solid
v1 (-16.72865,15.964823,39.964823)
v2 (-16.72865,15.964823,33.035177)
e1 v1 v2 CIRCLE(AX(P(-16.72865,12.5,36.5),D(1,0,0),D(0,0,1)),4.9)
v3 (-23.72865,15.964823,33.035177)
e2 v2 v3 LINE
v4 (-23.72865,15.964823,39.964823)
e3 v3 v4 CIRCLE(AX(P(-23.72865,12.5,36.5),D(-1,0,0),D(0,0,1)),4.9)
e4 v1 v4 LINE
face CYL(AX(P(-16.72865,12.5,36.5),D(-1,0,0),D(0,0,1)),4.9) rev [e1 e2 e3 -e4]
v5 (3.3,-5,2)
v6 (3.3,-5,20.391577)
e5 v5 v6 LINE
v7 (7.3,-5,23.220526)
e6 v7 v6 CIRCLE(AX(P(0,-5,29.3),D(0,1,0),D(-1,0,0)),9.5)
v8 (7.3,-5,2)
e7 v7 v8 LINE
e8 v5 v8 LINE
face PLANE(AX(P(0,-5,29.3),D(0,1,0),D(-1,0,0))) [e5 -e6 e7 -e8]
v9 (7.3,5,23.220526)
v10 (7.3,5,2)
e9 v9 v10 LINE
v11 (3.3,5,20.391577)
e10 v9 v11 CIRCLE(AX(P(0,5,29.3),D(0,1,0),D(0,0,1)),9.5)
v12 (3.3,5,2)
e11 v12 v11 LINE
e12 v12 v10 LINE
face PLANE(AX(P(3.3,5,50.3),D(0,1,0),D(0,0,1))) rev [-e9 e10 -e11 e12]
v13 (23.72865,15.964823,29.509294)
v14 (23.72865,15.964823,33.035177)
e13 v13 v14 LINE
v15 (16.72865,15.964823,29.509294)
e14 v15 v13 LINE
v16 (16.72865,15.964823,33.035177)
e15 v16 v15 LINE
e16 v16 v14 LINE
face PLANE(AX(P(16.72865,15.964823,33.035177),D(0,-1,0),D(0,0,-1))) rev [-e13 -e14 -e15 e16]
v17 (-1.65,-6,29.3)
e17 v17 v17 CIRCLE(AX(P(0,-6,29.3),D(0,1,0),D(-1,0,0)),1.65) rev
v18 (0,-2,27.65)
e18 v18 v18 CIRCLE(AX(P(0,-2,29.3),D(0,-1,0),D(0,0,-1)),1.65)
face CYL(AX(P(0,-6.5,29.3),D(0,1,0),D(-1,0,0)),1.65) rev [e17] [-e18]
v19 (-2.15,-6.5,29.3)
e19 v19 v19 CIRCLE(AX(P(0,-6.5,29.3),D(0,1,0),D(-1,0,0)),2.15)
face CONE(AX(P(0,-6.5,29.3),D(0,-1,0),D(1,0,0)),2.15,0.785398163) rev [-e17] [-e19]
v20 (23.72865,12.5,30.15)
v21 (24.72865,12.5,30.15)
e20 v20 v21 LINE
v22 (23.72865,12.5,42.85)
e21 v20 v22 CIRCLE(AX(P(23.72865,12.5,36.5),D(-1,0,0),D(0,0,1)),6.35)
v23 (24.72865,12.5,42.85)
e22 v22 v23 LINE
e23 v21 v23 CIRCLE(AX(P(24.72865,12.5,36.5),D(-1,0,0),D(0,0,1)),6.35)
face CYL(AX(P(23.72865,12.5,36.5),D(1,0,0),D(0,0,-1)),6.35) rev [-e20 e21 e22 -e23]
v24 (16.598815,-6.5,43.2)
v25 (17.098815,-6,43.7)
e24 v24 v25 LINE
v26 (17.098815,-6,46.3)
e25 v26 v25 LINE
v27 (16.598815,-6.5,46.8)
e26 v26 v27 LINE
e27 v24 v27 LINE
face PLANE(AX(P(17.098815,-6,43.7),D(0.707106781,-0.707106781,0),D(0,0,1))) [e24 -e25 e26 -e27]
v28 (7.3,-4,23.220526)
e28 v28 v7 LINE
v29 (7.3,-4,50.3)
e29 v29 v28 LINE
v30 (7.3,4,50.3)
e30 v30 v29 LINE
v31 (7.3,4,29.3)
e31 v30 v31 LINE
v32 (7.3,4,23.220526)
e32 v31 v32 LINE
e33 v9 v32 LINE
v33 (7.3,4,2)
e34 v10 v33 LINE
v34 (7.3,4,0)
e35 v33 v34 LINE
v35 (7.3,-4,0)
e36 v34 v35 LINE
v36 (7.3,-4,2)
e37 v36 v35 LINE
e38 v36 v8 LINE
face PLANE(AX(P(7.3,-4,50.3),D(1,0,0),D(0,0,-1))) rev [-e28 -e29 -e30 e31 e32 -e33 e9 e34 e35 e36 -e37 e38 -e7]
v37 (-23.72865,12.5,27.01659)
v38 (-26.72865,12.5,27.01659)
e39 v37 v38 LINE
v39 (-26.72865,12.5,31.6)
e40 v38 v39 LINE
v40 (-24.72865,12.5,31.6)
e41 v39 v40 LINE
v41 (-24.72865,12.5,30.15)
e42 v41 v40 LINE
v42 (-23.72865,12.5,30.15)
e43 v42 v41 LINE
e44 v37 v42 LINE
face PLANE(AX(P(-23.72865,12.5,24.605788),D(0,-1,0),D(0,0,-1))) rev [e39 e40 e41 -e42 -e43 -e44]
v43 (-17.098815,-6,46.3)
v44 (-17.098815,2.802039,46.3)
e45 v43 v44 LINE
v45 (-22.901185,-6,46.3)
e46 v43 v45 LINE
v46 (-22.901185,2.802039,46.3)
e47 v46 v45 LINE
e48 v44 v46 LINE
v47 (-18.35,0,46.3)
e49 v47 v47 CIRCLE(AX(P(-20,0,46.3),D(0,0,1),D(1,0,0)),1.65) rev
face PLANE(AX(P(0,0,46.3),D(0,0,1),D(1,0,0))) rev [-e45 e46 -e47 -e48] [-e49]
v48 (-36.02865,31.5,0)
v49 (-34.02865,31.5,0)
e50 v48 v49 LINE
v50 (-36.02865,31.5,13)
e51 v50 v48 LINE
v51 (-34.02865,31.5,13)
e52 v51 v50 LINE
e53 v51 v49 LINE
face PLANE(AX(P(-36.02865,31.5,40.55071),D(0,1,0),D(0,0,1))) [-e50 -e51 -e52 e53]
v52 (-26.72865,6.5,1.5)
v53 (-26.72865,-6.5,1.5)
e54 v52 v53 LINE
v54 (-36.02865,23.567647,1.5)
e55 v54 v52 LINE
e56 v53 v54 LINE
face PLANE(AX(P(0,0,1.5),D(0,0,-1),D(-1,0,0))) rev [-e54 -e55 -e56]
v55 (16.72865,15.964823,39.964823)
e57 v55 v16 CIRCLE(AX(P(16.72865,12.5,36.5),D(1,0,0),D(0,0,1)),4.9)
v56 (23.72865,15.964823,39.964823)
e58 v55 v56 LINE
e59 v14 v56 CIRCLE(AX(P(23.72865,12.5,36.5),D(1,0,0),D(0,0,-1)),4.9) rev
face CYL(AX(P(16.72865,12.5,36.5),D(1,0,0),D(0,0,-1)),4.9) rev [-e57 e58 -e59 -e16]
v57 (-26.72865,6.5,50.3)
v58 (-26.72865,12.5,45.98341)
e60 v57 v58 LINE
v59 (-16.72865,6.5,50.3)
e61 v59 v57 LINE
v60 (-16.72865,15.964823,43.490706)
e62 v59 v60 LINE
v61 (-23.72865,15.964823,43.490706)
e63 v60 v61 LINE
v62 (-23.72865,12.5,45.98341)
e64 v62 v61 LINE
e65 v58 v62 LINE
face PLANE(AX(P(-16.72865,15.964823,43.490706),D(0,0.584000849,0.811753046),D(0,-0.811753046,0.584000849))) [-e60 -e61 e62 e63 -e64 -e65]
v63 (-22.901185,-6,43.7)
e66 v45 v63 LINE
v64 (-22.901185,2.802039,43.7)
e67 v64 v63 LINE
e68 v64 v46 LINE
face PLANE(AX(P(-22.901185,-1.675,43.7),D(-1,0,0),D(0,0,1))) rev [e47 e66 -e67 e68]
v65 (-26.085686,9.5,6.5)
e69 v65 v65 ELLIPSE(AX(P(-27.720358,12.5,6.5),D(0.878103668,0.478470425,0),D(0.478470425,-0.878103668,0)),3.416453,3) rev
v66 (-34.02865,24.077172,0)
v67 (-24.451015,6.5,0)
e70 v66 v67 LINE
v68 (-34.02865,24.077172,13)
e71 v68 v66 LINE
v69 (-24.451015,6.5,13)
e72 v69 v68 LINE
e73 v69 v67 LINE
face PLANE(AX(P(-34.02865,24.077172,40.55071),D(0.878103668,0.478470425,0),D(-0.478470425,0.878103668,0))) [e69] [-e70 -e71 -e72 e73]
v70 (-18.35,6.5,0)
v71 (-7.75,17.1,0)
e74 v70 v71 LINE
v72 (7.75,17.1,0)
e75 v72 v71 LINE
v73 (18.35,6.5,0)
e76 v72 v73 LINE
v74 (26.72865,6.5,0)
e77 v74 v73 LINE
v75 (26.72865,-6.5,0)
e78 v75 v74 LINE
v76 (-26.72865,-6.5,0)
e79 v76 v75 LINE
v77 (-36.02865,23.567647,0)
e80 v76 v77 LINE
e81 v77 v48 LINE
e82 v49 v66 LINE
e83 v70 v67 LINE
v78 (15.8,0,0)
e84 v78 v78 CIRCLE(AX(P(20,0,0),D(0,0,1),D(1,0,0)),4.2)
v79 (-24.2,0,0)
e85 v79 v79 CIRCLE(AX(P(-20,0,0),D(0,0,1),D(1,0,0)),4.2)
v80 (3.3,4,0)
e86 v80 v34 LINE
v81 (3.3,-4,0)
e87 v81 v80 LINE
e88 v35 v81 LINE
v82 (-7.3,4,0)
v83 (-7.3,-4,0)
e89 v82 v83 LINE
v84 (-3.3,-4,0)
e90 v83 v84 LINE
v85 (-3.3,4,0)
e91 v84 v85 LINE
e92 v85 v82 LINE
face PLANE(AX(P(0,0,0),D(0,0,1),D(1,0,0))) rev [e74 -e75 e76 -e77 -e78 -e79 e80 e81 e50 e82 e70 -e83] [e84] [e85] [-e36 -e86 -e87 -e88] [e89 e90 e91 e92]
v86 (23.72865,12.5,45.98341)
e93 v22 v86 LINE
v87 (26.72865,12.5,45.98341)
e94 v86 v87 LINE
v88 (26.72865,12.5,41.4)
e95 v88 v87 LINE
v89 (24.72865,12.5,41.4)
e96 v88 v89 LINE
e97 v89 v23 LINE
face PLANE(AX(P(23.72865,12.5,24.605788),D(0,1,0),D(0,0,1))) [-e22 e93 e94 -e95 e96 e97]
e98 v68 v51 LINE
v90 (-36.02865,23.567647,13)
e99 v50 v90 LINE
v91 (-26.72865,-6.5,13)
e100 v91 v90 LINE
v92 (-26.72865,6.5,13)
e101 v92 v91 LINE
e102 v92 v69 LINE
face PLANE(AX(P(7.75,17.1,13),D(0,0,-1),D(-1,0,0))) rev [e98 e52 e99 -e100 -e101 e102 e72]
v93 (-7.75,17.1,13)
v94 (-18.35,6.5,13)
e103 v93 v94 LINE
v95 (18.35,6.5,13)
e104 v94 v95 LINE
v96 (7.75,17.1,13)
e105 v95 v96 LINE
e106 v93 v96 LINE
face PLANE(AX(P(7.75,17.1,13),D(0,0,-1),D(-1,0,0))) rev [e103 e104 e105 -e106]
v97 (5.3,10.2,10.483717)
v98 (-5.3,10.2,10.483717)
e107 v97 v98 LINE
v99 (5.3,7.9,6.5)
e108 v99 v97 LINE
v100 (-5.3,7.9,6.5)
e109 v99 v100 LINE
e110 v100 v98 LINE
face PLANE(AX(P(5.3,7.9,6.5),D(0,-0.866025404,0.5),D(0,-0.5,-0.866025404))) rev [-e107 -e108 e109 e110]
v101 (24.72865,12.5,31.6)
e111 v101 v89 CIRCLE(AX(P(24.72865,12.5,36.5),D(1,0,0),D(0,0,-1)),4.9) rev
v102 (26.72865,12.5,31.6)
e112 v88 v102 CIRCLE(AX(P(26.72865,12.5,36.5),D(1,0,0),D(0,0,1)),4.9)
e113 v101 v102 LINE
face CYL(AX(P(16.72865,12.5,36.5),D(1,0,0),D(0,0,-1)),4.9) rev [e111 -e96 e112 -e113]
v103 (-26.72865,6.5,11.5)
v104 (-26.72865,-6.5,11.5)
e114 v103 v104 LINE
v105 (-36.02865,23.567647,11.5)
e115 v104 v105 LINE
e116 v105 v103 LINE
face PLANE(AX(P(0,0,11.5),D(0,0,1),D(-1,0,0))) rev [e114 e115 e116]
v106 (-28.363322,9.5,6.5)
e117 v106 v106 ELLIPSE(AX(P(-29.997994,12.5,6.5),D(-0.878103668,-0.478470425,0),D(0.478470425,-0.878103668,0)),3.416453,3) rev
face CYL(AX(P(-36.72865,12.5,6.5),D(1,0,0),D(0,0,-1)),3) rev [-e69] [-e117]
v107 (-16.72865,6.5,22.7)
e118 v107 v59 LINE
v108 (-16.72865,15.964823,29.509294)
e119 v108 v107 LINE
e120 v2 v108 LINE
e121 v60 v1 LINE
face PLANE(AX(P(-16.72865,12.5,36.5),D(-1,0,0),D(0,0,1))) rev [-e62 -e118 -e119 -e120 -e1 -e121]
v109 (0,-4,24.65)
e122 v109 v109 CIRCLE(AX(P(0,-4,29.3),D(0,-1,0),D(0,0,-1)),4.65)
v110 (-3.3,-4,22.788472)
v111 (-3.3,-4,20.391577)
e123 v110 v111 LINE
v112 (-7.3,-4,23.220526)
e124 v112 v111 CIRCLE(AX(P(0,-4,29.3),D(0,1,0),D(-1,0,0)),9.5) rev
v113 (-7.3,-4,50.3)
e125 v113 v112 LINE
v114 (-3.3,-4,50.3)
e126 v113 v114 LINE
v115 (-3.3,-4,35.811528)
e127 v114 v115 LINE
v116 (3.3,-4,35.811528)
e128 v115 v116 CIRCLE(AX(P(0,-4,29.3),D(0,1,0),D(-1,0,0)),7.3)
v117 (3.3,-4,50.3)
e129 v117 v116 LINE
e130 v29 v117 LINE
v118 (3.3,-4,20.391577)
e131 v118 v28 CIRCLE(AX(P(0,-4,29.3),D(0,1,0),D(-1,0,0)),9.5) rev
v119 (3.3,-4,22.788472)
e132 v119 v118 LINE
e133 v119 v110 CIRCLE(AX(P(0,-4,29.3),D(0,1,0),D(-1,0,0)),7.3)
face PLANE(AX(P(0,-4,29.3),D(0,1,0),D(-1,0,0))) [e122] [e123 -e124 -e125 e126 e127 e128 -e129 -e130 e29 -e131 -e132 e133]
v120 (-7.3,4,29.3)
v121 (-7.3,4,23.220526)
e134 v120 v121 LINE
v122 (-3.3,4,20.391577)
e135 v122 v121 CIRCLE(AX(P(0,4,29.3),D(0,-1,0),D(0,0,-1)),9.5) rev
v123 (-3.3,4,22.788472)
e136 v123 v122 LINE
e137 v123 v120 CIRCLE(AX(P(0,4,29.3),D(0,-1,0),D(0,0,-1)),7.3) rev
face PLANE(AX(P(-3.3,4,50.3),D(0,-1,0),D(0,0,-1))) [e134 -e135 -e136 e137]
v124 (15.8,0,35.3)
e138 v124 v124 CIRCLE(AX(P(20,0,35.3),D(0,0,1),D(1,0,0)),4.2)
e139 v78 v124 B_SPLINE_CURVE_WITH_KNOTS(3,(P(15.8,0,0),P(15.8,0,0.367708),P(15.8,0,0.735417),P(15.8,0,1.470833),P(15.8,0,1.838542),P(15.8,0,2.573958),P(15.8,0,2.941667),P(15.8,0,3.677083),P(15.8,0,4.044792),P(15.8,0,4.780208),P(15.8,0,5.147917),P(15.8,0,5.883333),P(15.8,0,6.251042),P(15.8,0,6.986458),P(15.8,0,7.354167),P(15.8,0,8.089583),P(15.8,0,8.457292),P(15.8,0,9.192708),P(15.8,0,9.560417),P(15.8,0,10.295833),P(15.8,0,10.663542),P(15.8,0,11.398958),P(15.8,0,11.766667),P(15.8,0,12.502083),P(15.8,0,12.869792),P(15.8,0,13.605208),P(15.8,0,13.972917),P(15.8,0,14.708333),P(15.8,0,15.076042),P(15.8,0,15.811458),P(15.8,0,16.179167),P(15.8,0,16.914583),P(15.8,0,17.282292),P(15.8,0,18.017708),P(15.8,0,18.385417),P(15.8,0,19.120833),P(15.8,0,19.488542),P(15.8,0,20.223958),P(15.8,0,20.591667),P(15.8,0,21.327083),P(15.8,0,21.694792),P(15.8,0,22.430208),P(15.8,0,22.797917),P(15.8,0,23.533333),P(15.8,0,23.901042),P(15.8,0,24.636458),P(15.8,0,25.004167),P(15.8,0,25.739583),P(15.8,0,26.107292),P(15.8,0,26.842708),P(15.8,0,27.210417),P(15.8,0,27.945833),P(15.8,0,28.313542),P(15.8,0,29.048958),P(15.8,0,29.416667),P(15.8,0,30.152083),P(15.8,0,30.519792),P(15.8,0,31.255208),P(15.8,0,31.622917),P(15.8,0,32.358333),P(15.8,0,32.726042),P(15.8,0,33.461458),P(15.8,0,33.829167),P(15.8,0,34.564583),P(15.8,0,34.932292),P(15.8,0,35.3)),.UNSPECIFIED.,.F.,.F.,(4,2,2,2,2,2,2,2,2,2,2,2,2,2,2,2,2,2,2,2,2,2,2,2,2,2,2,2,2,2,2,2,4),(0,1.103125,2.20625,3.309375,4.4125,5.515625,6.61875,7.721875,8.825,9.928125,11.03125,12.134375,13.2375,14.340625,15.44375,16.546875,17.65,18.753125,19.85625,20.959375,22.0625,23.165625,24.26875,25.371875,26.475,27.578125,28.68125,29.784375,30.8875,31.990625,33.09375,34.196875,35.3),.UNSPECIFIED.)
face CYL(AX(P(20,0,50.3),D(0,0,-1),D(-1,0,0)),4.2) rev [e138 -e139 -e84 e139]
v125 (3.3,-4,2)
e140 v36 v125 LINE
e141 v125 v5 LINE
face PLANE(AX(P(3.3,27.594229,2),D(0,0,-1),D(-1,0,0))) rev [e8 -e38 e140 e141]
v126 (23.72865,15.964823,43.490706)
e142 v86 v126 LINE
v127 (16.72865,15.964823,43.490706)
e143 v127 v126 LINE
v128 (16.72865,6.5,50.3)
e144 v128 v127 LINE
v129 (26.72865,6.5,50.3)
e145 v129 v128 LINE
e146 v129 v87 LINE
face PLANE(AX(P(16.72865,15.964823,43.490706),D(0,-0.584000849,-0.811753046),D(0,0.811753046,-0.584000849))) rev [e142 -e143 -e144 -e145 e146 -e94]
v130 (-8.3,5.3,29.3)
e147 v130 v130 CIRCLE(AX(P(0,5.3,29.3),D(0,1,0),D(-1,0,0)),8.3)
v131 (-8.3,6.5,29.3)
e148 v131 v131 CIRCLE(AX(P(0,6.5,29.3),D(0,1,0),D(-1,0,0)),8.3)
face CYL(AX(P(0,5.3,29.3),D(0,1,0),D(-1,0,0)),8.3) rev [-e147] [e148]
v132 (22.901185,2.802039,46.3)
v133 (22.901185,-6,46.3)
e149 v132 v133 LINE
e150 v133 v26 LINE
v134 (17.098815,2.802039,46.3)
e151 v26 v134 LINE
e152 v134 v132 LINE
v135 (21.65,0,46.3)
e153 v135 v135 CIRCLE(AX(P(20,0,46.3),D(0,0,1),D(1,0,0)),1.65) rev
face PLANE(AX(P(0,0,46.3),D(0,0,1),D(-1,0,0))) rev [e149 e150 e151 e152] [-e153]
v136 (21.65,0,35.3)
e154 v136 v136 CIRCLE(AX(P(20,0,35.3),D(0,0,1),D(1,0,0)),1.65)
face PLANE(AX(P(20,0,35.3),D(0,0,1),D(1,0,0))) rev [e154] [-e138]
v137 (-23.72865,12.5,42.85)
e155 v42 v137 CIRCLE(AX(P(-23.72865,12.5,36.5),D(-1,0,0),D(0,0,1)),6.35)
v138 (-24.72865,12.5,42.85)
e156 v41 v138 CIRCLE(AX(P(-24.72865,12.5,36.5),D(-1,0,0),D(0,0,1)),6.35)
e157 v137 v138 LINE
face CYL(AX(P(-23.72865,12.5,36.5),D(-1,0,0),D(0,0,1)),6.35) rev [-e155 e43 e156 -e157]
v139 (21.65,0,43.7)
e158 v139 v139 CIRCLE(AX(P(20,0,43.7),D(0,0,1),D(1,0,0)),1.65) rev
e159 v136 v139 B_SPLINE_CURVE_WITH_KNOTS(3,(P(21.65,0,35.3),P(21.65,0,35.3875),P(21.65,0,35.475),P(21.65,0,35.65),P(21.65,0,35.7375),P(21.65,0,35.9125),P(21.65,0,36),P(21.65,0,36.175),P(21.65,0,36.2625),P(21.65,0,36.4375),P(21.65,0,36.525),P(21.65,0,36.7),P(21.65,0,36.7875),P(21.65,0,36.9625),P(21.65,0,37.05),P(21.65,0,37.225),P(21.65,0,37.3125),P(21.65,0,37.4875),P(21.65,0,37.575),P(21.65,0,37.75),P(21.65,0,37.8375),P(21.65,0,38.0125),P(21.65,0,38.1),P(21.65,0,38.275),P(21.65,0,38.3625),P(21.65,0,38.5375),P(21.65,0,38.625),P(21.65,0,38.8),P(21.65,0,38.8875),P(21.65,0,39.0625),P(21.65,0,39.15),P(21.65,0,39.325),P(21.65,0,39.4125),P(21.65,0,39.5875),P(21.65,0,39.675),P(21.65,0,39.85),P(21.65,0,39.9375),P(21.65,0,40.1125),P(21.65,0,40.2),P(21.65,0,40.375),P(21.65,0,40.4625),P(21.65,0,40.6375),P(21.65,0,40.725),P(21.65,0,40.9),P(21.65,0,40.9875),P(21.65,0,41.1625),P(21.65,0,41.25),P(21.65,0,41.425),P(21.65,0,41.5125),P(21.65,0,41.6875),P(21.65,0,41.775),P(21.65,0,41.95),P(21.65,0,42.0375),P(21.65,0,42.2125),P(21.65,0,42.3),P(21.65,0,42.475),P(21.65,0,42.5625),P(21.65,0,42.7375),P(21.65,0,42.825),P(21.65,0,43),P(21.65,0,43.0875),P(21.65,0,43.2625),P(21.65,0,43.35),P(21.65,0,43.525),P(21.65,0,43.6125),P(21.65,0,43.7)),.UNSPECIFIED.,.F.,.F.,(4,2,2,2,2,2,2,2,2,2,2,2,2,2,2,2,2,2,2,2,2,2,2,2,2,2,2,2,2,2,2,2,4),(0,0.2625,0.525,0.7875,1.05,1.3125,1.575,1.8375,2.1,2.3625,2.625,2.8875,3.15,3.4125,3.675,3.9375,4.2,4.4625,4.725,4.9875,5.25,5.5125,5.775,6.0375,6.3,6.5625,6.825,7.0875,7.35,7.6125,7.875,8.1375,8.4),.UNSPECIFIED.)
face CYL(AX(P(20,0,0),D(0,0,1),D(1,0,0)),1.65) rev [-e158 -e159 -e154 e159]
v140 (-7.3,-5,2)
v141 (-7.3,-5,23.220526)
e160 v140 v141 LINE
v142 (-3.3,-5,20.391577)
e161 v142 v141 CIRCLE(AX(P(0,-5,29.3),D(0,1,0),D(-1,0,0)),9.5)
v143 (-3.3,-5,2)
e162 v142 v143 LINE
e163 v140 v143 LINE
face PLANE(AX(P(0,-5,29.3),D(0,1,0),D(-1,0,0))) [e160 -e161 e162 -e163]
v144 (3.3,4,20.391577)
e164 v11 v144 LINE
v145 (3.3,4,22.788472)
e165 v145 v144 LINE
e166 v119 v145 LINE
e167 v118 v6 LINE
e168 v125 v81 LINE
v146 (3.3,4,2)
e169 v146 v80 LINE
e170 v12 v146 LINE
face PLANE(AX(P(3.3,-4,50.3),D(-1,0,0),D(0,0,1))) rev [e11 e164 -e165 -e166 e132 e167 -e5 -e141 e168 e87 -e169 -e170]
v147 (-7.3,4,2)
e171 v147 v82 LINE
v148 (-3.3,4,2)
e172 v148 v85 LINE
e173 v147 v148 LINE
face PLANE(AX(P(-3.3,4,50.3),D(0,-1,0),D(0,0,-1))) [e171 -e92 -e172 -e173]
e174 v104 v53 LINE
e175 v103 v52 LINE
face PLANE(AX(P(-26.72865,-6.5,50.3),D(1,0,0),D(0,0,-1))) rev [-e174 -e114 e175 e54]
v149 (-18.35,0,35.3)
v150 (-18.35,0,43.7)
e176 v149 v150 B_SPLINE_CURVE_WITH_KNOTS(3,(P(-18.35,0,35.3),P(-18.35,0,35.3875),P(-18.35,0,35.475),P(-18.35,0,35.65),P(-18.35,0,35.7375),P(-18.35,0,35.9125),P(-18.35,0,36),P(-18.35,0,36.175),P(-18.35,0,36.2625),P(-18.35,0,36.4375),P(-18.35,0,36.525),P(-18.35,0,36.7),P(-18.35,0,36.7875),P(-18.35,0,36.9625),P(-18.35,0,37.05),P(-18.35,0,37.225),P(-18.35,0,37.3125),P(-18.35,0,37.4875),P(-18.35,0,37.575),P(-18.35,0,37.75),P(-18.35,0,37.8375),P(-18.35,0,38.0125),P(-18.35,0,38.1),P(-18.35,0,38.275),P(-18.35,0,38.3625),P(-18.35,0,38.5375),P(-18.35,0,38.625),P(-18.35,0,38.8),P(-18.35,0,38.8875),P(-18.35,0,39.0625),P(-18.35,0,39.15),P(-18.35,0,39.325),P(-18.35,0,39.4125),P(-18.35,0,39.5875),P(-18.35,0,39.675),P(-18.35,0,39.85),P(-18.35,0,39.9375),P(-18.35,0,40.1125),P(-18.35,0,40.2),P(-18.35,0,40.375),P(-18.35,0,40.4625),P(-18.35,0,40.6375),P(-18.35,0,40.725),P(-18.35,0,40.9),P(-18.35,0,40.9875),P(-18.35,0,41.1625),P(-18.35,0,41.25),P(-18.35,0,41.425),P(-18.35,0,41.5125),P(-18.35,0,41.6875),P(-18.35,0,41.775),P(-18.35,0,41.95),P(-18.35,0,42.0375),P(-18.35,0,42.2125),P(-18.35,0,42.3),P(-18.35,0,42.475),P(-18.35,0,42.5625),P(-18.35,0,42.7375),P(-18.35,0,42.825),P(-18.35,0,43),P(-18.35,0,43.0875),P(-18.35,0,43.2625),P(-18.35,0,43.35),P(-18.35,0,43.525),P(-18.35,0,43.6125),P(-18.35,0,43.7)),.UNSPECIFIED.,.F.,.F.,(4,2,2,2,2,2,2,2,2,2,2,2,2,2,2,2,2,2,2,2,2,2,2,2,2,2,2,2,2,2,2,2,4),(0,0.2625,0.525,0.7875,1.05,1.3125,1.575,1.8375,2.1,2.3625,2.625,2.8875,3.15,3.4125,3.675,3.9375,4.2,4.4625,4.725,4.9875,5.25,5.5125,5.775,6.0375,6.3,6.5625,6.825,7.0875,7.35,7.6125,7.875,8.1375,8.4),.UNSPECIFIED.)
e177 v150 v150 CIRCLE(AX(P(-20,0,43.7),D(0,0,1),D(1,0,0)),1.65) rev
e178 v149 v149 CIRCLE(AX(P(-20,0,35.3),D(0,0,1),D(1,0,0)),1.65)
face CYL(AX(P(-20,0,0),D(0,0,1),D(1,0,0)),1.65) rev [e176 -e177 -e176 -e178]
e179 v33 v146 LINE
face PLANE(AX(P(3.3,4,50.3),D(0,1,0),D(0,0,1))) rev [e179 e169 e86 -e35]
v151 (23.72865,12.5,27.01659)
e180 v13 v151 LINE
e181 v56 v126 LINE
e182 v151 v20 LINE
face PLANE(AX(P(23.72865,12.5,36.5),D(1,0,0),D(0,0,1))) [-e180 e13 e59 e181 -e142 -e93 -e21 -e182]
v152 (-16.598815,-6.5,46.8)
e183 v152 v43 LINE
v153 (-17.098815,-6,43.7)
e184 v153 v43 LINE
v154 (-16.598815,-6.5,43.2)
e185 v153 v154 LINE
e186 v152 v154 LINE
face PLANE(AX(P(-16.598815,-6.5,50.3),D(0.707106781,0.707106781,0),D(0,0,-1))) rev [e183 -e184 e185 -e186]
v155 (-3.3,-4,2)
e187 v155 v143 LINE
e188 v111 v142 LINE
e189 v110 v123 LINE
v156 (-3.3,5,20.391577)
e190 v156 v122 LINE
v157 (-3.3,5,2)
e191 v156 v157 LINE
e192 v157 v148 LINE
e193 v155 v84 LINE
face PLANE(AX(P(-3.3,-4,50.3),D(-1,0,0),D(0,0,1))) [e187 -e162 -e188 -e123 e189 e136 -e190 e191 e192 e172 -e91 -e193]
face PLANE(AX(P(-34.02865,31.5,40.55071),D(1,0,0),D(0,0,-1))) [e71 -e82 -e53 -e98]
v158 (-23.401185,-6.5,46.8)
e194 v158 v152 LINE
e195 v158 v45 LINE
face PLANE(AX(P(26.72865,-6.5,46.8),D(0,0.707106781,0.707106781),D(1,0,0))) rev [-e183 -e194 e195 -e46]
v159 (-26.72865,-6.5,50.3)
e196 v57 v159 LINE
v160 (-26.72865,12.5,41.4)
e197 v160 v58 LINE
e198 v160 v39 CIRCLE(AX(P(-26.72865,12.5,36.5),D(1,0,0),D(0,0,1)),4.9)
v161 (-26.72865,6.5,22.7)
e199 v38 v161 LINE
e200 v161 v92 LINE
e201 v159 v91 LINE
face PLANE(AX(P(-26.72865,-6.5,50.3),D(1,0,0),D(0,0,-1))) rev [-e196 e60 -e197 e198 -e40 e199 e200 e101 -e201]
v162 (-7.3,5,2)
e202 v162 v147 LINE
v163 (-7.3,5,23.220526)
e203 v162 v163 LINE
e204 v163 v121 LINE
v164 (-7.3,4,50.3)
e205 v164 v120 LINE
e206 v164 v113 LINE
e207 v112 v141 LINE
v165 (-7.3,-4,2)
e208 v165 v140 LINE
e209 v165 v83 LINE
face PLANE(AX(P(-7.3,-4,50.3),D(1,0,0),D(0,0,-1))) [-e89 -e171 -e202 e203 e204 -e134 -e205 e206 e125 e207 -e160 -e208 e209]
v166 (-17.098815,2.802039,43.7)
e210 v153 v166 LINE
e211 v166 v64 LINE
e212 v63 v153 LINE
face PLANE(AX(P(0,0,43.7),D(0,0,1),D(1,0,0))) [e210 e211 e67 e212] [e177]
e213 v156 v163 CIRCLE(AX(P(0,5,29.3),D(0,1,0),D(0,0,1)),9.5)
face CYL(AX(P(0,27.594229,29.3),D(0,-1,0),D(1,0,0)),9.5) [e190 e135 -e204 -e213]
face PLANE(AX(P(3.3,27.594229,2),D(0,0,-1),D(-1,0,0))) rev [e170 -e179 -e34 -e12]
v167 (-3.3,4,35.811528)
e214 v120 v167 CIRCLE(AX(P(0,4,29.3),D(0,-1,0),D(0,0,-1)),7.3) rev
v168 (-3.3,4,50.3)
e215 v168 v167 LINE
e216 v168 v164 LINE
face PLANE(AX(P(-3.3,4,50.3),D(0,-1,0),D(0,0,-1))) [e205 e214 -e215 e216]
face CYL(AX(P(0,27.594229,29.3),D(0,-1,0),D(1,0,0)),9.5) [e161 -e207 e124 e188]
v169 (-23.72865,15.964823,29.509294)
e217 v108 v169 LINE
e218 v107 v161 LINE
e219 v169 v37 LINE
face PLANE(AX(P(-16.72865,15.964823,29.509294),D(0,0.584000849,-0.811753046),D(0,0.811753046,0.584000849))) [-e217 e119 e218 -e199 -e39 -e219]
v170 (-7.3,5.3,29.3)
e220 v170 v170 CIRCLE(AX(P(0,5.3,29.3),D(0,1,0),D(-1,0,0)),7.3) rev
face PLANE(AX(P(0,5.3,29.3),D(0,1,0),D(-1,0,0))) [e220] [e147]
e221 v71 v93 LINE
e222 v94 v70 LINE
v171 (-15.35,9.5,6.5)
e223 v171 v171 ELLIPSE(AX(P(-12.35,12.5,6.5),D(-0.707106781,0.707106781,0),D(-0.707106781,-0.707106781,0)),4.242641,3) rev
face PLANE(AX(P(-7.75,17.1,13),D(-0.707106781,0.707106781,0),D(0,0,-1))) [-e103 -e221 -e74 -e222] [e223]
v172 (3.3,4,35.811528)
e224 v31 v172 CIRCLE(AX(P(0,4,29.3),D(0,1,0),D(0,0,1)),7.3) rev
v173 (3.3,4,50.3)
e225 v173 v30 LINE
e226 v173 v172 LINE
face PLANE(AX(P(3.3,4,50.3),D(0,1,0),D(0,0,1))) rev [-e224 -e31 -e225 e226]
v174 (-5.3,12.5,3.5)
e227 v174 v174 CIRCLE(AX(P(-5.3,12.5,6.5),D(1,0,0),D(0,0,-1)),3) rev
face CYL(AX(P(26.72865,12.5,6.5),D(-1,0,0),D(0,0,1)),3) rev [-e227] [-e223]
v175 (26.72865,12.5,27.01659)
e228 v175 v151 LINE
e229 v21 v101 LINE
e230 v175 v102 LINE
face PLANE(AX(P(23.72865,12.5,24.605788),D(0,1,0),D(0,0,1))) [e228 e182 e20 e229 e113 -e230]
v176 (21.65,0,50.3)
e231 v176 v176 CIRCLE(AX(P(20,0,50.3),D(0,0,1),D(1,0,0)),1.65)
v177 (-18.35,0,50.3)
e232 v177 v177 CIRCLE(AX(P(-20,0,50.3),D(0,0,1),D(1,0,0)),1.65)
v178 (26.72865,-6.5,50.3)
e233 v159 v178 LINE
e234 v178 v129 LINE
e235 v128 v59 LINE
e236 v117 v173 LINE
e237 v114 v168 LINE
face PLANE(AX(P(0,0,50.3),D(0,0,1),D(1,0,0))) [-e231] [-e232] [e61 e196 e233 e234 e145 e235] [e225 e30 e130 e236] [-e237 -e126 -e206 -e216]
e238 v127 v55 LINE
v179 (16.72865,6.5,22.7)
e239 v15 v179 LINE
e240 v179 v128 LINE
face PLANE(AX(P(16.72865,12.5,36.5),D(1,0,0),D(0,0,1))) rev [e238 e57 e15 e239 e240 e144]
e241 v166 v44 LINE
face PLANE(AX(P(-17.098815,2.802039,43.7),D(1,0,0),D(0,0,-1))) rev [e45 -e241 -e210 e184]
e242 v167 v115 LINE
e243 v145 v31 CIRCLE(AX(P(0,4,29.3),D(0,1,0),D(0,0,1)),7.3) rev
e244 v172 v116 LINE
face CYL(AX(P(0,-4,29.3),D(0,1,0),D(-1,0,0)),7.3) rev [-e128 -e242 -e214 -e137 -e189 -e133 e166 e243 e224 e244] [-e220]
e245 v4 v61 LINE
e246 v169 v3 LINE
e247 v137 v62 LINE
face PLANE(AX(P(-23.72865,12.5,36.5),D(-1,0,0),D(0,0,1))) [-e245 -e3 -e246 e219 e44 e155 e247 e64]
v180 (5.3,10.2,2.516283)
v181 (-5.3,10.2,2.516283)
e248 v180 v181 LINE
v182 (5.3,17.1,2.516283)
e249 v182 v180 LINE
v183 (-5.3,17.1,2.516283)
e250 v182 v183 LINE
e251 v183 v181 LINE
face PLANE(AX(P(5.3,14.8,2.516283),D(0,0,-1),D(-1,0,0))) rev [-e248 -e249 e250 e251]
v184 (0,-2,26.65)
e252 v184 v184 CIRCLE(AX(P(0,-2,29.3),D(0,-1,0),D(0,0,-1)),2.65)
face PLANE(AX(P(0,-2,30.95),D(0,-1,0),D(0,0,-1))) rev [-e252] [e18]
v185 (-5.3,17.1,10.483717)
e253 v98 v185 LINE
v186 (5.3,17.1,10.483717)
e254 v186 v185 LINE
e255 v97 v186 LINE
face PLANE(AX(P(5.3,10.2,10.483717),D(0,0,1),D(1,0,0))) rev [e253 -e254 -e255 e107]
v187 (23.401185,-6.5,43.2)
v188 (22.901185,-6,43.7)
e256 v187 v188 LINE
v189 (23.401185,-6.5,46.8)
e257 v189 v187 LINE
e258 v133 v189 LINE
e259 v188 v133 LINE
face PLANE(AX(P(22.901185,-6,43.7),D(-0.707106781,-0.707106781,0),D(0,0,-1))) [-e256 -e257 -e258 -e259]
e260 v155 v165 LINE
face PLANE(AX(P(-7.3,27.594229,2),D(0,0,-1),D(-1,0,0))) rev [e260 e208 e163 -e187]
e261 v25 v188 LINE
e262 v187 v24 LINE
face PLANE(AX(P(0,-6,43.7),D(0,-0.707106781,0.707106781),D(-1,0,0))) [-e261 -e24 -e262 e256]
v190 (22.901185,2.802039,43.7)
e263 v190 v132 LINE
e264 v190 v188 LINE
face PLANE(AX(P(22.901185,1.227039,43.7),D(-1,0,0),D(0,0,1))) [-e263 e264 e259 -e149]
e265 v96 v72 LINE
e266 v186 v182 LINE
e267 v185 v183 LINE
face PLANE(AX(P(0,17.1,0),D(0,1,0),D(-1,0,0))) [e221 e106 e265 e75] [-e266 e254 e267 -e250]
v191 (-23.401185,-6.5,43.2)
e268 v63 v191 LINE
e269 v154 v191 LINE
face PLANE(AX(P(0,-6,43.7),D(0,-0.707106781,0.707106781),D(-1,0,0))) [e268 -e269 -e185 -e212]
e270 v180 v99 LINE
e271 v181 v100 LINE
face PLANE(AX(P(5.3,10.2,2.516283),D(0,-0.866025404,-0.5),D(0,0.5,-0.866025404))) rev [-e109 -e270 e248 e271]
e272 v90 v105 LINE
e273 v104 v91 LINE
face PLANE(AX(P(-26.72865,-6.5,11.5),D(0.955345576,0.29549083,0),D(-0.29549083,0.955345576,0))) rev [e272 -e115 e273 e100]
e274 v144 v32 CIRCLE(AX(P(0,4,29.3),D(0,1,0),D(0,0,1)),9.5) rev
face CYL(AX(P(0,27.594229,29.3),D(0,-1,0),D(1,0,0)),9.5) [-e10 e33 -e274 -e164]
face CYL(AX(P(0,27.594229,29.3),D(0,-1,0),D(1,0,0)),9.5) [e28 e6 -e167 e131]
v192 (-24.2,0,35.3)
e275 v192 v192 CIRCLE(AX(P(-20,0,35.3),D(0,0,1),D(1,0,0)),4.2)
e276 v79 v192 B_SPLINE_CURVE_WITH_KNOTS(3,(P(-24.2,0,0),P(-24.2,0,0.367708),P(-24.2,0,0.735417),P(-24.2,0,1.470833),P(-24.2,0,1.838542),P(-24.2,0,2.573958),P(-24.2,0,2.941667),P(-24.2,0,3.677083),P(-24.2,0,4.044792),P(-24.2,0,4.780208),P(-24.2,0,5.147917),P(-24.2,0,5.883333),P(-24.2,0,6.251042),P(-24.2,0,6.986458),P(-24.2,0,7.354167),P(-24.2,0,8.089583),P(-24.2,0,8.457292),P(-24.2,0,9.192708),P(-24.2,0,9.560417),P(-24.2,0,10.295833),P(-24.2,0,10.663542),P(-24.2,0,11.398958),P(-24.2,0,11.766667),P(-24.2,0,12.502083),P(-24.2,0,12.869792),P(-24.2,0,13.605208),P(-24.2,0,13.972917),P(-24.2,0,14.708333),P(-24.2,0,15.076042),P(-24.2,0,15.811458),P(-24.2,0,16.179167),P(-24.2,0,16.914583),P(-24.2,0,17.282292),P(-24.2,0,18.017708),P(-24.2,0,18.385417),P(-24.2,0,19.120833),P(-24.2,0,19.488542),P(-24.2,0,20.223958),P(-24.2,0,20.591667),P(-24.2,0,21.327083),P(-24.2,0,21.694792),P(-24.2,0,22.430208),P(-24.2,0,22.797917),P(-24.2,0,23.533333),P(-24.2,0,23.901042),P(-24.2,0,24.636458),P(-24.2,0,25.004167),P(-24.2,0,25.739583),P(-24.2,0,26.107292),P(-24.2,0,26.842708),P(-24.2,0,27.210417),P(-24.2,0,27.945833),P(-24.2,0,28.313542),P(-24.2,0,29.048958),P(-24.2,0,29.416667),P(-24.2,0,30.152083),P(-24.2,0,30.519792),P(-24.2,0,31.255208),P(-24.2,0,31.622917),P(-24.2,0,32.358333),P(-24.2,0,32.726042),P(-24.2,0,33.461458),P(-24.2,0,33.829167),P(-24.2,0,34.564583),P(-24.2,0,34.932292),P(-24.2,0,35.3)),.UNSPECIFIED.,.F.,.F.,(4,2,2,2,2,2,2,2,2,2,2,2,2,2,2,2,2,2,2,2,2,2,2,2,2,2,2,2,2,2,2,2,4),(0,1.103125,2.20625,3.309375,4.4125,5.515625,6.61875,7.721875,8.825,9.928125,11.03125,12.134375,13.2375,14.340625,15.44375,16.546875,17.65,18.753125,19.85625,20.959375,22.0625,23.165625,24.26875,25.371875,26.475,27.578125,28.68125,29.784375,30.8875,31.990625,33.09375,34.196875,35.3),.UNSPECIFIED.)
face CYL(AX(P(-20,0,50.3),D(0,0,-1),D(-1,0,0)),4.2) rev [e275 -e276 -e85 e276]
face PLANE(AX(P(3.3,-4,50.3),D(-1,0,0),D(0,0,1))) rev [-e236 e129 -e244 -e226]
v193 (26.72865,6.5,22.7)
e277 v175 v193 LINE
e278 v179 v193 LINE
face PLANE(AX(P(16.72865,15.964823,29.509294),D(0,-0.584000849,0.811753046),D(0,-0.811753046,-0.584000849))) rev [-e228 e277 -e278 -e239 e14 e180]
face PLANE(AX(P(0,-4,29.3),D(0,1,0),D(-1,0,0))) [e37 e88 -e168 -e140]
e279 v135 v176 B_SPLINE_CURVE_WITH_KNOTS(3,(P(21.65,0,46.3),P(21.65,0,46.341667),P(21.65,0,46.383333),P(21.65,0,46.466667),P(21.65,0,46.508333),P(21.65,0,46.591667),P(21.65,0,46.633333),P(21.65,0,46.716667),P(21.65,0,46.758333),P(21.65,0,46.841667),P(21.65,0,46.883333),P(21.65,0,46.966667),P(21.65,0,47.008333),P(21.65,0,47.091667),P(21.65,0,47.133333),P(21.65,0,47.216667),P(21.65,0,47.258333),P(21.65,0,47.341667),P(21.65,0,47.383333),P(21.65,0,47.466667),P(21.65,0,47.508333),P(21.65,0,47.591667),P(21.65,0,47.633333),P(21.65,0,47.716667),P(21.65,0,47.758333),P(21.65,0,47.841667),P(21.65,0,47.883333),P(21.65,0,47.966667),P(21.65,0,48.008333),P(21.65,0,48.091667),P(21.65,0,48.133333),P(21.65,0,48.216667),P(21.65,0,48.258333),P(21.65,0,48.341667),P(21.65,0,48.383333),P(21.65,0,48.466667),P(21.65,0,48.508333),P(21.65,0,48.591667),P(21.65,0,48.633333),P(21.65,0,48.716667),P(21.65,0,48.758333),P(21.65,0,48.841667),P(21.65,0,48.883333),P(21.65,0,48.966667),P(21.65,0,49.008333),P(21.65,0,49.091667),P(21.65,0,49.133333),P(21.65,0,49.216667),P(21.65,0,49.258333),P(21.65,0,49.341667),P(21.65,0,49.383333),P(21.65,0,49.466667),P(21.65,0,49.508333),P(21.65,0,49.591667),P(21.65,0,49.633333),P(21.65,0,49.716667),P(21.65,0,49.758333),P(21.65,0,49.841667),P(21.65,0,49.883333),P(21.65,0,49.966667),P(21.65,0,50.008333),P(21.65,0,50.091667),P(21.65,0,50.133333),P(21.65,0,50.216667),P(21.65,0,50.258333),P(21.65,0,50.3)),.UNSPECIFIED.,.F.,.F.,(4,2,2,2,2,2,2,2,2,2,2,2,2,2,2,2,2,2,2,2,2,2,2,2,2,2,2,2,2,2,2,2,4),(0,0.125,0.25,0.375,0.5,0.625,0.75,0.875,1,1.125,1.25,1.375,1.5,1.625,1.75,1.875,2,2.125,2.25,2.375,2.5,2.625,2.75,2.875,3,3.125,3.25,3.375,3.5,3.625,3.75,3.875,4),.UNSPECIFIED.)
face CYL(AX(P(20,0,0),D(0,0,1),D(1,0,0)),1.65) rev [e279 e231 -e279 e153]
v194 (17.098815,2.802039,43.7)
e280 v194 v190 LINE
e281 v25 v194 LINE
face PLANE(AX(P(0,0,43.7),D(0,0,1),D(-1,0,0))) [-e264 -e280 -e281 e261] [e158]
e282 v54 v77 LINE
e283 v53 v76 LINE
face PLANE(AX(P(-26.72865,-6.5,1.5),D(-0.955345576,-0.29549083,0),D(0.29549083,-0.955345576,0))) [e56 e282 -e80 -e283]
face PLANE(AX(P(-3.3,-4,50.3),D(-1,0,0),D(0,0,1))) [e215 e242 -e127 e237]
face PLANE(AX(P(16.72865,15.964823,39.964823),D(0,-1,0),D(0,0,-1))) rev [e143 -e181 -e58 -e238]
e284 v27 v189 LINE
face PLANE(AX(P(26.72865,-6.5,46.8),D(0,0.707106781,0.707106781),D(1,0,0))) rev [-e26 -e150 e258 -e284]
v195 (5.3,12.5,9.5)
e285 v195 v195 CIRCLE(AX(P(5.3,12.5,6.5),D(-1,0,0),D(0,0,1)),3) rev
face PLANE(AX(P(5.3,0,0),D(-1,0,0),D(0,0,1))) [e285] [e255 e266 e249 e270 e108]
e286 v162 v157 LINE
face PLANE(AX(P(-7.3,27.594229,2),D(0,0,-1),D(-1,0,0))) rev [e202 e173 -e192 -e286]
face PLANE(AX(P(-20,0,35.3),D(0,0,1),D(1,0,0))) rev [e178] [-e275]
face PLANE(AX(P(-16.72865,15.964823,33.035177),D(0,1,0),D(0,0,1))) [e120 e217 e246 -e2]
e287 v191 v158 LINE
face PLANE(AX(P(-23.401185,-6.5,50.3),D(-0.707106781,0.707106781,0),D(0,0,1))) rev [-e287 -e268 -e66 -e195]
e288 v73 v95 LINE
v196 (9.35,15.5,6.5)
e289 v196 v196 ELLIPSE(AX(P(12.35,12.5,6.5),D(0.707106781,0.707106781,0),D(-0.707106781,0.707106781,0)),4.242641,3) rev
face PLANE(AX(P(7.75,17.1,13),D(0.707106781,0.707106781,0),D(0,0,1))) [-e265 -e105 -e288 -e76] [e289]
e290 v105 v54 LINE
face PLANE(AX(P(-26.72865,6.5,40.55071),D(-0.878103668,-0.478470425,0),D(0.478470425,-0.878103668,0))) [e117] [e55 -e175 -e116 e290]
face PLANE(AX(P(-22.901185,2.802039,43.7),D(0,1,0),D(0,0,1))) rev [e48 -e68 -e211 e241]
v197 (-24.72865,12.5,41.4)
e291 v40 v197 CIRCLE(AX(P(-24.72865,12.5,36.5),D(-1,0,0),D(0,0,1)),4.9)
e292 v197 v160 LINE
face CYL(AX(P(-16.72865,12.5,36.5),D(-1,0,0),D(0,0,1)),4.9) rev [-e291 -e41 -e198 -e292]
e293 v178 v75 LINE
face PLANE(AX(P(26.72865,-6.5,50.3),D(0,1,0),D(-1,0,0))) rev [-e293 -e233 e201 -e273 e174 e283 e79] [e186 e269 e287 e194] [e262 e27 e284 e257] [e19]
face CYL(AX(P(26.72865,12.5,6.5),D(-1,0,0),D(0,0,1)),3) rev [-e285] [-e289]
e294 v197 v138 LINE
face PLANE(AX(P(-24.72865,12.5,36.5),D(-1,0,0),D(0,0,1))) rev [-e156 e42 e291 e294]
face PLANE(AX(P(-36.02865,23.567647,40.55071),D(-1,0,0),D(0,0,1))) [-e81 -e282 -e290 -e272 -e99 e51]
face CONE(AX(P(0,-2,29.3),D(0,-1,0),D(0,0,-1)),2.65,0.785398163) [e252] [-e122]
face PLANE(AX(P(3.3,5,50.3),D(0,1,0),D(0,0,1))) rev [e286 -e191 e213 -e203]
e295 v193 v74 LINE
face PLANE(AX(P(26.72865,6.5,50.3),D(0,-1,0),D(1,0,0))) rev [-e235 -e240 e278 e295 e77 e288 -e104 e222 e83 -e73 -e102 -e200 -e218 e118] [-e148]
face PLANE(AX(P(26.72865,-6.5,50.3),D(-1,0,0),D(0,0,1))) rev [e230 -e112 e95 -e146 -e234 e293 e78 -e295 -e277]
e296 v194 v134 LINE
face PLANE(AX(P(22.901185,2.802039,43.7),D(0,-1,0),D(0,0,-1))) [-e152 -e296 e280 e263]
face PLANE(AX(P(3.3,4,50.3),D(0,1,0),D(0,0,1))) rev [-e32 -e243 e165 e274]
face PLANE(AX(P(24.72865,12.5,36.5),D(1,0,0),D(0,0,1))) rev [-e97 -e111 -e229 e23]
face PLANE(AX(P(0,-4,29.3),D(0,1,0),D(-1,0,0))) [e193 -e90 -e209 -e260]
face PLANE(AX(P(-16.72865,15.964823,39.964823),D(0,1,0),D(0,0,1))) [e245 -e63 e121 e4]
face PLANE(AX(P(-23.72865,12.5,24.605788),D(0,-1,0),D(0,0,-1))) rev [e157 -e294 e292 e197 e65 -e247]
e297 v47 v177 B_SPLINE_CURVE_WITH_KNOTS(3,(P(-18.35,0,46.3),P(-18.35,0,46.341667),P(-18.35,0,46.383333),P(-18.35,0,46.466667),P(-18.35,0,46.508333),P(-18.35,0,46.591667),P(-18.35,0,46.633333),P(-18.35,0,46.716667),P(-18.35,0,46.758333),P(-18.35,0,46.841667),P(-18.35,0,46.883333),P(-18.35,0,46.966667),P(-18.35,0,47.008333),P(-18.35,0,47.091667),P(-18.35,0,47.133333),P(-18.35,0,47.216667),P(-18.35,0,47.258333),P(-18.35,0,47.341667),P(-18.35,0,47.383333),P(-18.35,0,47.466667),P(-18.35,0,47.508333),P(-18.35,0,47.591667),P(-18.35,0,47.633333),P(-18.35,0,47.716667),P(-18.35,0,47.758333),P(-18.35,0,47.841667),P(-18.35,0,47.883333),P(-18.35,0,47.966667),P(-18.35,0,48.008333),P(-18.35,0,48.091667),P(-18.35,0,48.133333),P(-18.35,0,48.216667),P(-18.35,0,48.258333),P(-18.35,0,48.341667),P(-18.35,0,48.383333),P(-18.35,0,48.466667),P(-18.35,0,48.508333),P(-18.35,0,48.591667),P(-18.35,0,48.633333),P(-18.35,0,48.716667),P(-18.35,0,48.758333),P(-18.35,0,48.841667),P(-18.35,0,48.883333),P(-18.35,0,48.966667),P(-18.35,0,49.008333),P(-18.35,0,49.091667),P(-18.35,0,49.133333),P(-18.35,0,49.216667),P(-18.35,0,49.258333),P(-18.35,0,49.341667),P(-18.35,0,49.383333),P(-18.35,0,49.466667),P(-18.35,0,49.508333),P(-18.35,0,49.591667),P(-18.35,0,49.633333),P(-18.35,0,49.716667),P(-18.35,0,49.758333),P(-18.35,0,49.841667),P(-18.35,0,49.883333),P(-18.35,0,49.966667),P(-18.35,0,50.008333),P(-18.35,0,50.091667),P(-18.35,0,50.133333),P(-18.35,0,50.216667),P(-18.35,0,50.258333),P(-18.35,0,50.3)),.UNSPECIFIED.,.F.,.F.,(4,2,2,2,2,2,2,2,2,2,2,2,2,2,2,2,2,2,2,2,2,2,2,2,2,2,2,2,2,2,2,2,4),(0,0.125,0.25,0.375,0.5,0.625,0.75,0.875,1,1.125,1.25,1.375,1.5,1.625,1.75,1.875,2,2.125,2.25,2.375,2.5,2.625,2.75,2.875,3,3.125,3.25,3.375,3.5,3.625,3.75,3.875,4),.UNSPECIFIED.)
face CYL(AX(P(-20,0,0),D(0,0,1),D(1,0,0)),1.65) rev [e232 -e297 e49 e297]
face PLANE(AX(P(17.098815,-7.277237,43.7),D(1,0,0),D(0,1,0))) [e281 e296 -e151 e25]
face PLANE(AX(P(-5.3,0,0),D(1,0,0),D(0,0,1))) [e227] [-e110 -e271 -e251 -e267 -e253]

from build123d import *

# Parameters (mm, degrees)
SKETCH1_W           = 53.4573
SKETCH1_H           = 13
SKETCH1_R           = 4.2
BOSS_EXTRUDE1_DEPTH = 50.3
BOSS_EXTRUDE2_START = -15
SKETCH3_R           = 4.2
BOSS_EXTRUDE2_DEPTH = 15
SKETCH8_W           = 15.5
SKETCH8_H           = 13
BOSS_EXTRUDE3_DEPTH = 10.6
CHAMFER1_SIZE       = 10.6
SKETCH5_R           = 3
SKETCH5_R_2         = 4
CUT_EXTRUDE1_DEPTH  = 76.366988286
CUT_EXTRUDE2_DEPTH  = 5.3
BOSS_EXTRUDE4_DEPTH = 10
CUT_EXTRUDE3_DEPTH  = 1
SKETCH13_W          = 21.695080859
SKETCH13_H          = 9.09610943
CUT_EXTRUDE4_DEPTH  = 3
SKETCH16_R          = 1.65
CUT_EXTRUDE5_DEPTH  = 59.425257644
SKETCH17_R          = 7.3
CUT_EXTRUDE6_DEPTH  = 10.5
SKETCH15_W          = 4
SKETCH15_H          = 8
CUT_EXTRUDE7_DEPTH  = 60.472016368
SKETCH18_R          = 8.3
CUT_EXTRUDE8_DEPTH  = 1.2
SKETCH21_R          = 1.65
CUT_EXTRUDE9_DEPTH  = 60.472016368
CUT_EXTRUDE10_DEPTH = 2.6
CUT_EXTRUDE11_START = -1
CUT_EXTRUDE11_DEPTH = 10
BOSS_EXTRUDE5_DEPTH = 13
CUT_EXTRUDE12_START = 10
SKETCH27_R          = 3
CUT_EXTRUDE12_DEPTH = 10
BOSS_EXTRUDE7_DEPTH = 1.5
CUT_EXTRUDE13_REACH = 81.875
CHAMFER2_SIZE       = 0.5


# Read off the part's stored shape, not the designer's step: Cut-Extrude11
with BuildPart() as part:
    # Sketch1 → Boss-Extrude1 (new body)
    with BuildSketch(Plane.XY):
        Rectangle(SKETCH1_W, SKETCH1_H)
        with Locations(Location((-20, 0, 0), (0, 0, 180))):
            Circle(SKETCH1_R, mode=Mode.SUBTRACT)
        with Locations(Location((20, 0, 0), (0, 0, 180))):
            Circle(SKETCH1_R, mode=Mode.SUBTRACT)
    extrude(amount=BOSS_EXTRUDE1_DEPTH)

    # Sketch3 → Boss-Extrude2 (add)
    with BuildSketch(Plane.XY.offset(50.3).offset(BOSS_EXTRUDE2_START)):
        with Locations(Location((-20, 0, 0), (0, 0, 180))):
            Circle(SKETCH3_R)
        with Locations(Location((20, 0, 0), (0, 0, 180))):
            Circle(SKETCH3_R)
    extrude(amount=BOSS_EXTRUDE2_DEPTH)

    # Sketch8 → Boss-Extrude3 (add)
    with BuildSketch(Plane(origin=(0, 6.5, 0), x_dir=(1, 0, 0), z_dir=(0, 1, 0))):
        with Locations((0, -6.5)):
            Rectangle(SKETCH8_W, SKETCH8_H)
    extrude(amount=BOSS_EXTRUDE3_DEPTH)

    # Chamfer1
    chamfer1_edges = [part.edges().sort_by_distance(p)[0] for p in [
        (7.75, 6.5, 6.5),
        (-7.75, 6.5, 6.5),
    ]]
    chamfer(chamfer1_edges, length=CHAMFER1_SIZE - 0.0001)  # a hair under: the kernel refuses the full size

    # Sketch5 → Cut-Extrude1 (cut, through all)
    with BuildSketch(Plane.ZY.offset(26.72865)):
        with Locations(Location((6.5, 12.5, 0), (0, 0, 270))):
            Circle(SKETCH5_R)
        with Locations((36.5, 12.5)):
            Circle(SKETCH5_R_2)
    extrude(amount=-CUT_EXTRUDE1_DEPTH, mode=Mode.SUBTRACT)

    # Sketch10 → Cut-Extrude2 (cut)
    with BuildSketch(Plane.ZY):
        Polygon((2.516283143, 14.8), (2.516283143, 17.1), (10.483716857, 17.1), (10.483716857, 14.8), (10.483716857, 10.2), (6.5, 7.9), (2.516283143, 10.2), align=None)
    cut_extrude2 = extrude(amount=-CUT_EXTRUDE2_DEPTH, mode=Mode.SUBTRACT)

    # Mirror1: Cut-Extrude2 across plane
    add(cut_extrude2.mirror(Plane.ZY), mode=Mode.SUBTRACT)

    # Sketch11 → Boss-Extrude4 (add)
    with BuildSketch(Plane.ZY.offset(26.72865)):
        with BuildLine():
            Line((33.035176772, 15.964823228), (29.509293572, 15.964823228))
            Line((29.509293572, 15.964823228), (22.7, 6.5))
            Line((22.7, 6.5), (50.3, 6.5))
            Line((50.3, 6.5), (43.490706428, 15.964823228))
            Line((43.490706428, 15.964823228), (39.964823228, 15.964823228))
            ThreePointArc((39.964823228, 15.964823228), (36.5, 7.6), (33.035176772, 15.964823228))
        make_face()
    boss_extrude4 = extrude(amount=-BOSS_EXTRUDE4_DEPTH)

    # Sketch12 → Cut-Extrude3 (cut)
    with BuildSketch(Plane.ZY.offset(24.72865)):
        with BuildLine():
            Line((30.15, 12.5), (30.15, 21.960655534))
            Line((30.15, 21.960655534), (42.85, 21.960655534))
            Line((42.85, 21.960655534), (42.85, 12.5))
            ThreePointArc((42.85, 12.5), (36.5, 6.15), (30.15, 12.5))
        make_face()
    cut_extrude3 = extrude(amount=-CUT_EXTRUDE3_DEPTH, mode=Mode.SUBTRACT)

    # Sketch13 → Cut-Extrude4 (cut)
    with BuildSketch(Plane.ZY.offset(26.72865)):
        with Locations((35.453328021, 17.048054715)):
            Rectangle(SKETCH13_W, SKETCH13_H)
    cut_extrude4 = extrude(amount=-CUT_EXTRUDE4_DEPTH, mode=Mode.SUBTRACT)

    # Mirror2: Boss-Extrude4, Cut-Extrude3, Cut-Extrude4 across plane
    add(boss_extrude4.mirror(Plane.ZY))
    add(cut_extrude3.mirror(Plane.ZY), mode=Mode.SUBTRACT)
    add(cut_extrude4.mirror(Plane.ZY), mode=Mode.SUBTRACT)

    # Sketch16 → Cut-Extrude5 (cut, through all)
    with BuildSketch(Plane(origin=(0, 6.5, 0), x_dir=(1, 0, 0), z_dir=(0, 1, 0))):
        with Locations(Location((0, -29.3, 0), (0, 0, 180))):
            Circle(SKETCH16_R)
    extrude(amount=-CUT_EXTRUDE5_DEPTH, mode=Mode.SUBTRACT)

    # Sketch17 → Cut-Extrude6 (cut)
    with BuildSketch(Plane(origin=(0, 6.5, 0), x_dir=(1, 0, 0), z_dir=(0, 1, 0))):
        with Locations(Location((0, -29.3, 0), (0, 0, 180))):
            Circle(SKETCH17_R)
    extrude(amount=-CUT_EXTRUDE6_DEPTH, mode=Mode.SUBTRACT)

    # Sketch15 → Cut-Extrude7 (cut, through all)
    with BuildSketch(Plane(origin=(0, 0, 0), x_dir=(-1, 0, 0), z_dir=(0, 0, -1))):
        with Locations((-5.3, 0)):
            Rectangle(SKETCH15_W, SKETCH15_H)
    cut_extrude7 = extrude(amount=-CUT_EXTRUDE7_DEPTH, mode=Mode.SUBTRACT)

    # Mirror3: Cut-Extrude7 across plane
    add(cut_extrude7.mirror(Plane.ZY), mode=Mode.SUBTRACT)

    # Sketch18 → Cut-Extrude8 (cut)
    with BuildSketch(Plane(origin=(0, 6.5, 0), x_dir=(1, 0, 0), z_dir=(0, 1, 0))):
        with Locations(Location((0, -29.3, 0), (0, 0, 180))):
            Circle(SKETCH18_R)
    extrude(amount=-CUT_EXTRUDE8_DEPTH, mode=Mode.SUBTRACT)

    # Sketch20 → Revolve1 (revolve)
    with BuildSketch(Plane.ZY, mode=Mode.PRIVATE) as revolve1_sk:
        Polygon((30.95, -4), (30.95, -2), (31.95, -2), (33.95, -4), align=None)
    revolve(revolve1_sk.sketch.rotate(Axis((0, -4, 29.3), (0, 1, 0)), 270), axis=Axis((0, -4, 29.3), (0, 1, 0)))

    # Sketch21 → Cut-Extrude9 (cut, through all)
    with BuildSketch(Plane.XY.offset(50.3)):
        with Locations((20, 0)):
            Circle(SKETCH21_R)
        with Locations((-20, 0)):
            Circle(SKETCH21_R)
    extrude(amount=-CUT_EXTRUDE9_DEPTH, mode=Mode.SUBTRACT)

    # Sketch22 → Cut-Extrude10 (cut)
    with BuildSketch(Plane.XY.offset(46.3)):
        Polygon((-22.901185103, 1.227039119), (-22.901185103, 2.802039119), (-17.098814897, 2.802039119), (-17.098814897, 1.413894196), (-17.098814897, -1.675), (-17.098814897, -7.277237341), (-22.901185103, -7.277237341), (-22.901185103, -1.675), align=None)
    cut_extrude10 = extrude(amount=-CUT_EXTRUDE10_DEPTH, mode=Mode.SUBTRACT)

    # Mirror4: Cut-Extrude10 across plane
    add(cut_extrude10.mirror(Plane.ZY), mode=Mode.SUBTRACT)

    # Cut-Extrude11 outline → Cut-Extrude11 (cut)
    with BuildSketch(Plane(origin=(0, -4, 0), x_dir=(1, 0, 0), z_dir=(0, 1, 0)).offset(CUT_EXTRUDE11_START)):
        with BuildLine():
            ThreePointArc((3.3, -20.391577019), (5.485502581, -21.543759839), (7.3, -23.220526339))
            Line((7.3, -23.220526339), (7.3, -2))
            Line((7.3, -2), (3.3, -2))
            Line((3.3, -2), (3.3, -20.391577019))
        make_face()
        with BuildLine():
            Line((-7.3, -2), (-7.3, -23.220526339))
            ThreePointArc((-7.3, -23.220526339), (-5.485502581, -21.543759839), (-3.3, -20.391577019))
            Line((-3.3, -20.391577019), (-3.3, -2))
            Line((-3.3, -2), (-7.3, -2))
        make_face()
    extrude(amount=CUT_EXTRUDE11_DEPTH, mode=Mode.SUBTRACT)

    # Sketch26 → Boss-Extrude5 (add)
    with BuildSketch(Plane(origin=(0, 0, 0), x_dir=(-1, 0, 0), z_dir=(0, 0, -1))):
        Polygon((24.4510146, 6.5), (26.72865, 6.5), (36.02865, 23.567646595), (36.02865, 31.5), (34.02865, 31.5), (34.02865, 24.077171637), align=None)
    extrude(amount=-BOSS_EXTRUDE5_DEPTH)

    # Sketch27 → Cut-Extrude12 (cut)
    with BuildSketch(Plane.ZY.offset(26.72865).offset(CUT_EXTRUDE12_START)):
        with Locations(Location((6.5, 12.5, 0), (0, 0, 270))):
            Circle(SKETCH27_R)
    extrude(amount=-CUT_EXTRUDE12_DEPTH, mode=Mode.SUBTRACT)

    # Sketch29 → Boss-Extrude7 (add)
    with BuildSketch(Plane(origin=(0, 0, 0), x_dir=(-1, 0, 0), z_dir=(0, 0, -1))):
        Polygon((26.72865, -6.5), (36.02865, 23.567646595), (26.72865, 6.5), align=None)
    boss_extrude7 = extrude(amount=-BOSS_EXTRUDE7_DEPTH)

    # Mirror5: Boss-Extrude7 across plane
    add(boss_extrude7.mirror(Plane(origin=(0, 0, 6.5), x_dir=(1, 0, 0), z_dir=(0, 0, -1))))

    # Sketch30 → Cut-Extrude13 (cut, up to next)
    with BuildSketch(Plane.ZY.offset(26.72865), mode=Mode.PRIVATE) as cut_extrude13_sk1:
        with BuildLine():
            Line((8.8848588, 10.679986675), (4.1151412, 10.679986675))
            ThreePointArc((4.1151412, 10.679986675), (6.5, 9.5), (8.8848588, 10.679986675))
        make_face()
    cut_extrude13_tool1 = extrude(cut_extrude13_sk1.sketch, amount=-CUT_EXTRUDE13_REACH, mode=Mode.PRIVATE) & part.part
    add(cut_extrude13_tool1.solids().sort_by_distance((-26.72865, 10.199004, 6.5))[0], mode=Mode.SUBTRACT)

    # Chamfer2
    chamfer2_edges = [part.edges().sort_by_distance(p)[0] for p in [
        (1.65, -6.5, 29.3),
        (-17.098814897, -6.5, 45),
        (-22.901185103, -6.5, 45),
        (-20, -6.5, 43.7),
        (-20, -6.5, 46.3),
        (22.901185103, -6.5, 45),
        (17.098814897, -6.5, 45),
        (20, -6.5, 43.7),
        (20, -6.5, 46.3),
    ]]
    chamfer(chamfer2_edges, length=CHAMFER2_SIZE)


solid = part.part
